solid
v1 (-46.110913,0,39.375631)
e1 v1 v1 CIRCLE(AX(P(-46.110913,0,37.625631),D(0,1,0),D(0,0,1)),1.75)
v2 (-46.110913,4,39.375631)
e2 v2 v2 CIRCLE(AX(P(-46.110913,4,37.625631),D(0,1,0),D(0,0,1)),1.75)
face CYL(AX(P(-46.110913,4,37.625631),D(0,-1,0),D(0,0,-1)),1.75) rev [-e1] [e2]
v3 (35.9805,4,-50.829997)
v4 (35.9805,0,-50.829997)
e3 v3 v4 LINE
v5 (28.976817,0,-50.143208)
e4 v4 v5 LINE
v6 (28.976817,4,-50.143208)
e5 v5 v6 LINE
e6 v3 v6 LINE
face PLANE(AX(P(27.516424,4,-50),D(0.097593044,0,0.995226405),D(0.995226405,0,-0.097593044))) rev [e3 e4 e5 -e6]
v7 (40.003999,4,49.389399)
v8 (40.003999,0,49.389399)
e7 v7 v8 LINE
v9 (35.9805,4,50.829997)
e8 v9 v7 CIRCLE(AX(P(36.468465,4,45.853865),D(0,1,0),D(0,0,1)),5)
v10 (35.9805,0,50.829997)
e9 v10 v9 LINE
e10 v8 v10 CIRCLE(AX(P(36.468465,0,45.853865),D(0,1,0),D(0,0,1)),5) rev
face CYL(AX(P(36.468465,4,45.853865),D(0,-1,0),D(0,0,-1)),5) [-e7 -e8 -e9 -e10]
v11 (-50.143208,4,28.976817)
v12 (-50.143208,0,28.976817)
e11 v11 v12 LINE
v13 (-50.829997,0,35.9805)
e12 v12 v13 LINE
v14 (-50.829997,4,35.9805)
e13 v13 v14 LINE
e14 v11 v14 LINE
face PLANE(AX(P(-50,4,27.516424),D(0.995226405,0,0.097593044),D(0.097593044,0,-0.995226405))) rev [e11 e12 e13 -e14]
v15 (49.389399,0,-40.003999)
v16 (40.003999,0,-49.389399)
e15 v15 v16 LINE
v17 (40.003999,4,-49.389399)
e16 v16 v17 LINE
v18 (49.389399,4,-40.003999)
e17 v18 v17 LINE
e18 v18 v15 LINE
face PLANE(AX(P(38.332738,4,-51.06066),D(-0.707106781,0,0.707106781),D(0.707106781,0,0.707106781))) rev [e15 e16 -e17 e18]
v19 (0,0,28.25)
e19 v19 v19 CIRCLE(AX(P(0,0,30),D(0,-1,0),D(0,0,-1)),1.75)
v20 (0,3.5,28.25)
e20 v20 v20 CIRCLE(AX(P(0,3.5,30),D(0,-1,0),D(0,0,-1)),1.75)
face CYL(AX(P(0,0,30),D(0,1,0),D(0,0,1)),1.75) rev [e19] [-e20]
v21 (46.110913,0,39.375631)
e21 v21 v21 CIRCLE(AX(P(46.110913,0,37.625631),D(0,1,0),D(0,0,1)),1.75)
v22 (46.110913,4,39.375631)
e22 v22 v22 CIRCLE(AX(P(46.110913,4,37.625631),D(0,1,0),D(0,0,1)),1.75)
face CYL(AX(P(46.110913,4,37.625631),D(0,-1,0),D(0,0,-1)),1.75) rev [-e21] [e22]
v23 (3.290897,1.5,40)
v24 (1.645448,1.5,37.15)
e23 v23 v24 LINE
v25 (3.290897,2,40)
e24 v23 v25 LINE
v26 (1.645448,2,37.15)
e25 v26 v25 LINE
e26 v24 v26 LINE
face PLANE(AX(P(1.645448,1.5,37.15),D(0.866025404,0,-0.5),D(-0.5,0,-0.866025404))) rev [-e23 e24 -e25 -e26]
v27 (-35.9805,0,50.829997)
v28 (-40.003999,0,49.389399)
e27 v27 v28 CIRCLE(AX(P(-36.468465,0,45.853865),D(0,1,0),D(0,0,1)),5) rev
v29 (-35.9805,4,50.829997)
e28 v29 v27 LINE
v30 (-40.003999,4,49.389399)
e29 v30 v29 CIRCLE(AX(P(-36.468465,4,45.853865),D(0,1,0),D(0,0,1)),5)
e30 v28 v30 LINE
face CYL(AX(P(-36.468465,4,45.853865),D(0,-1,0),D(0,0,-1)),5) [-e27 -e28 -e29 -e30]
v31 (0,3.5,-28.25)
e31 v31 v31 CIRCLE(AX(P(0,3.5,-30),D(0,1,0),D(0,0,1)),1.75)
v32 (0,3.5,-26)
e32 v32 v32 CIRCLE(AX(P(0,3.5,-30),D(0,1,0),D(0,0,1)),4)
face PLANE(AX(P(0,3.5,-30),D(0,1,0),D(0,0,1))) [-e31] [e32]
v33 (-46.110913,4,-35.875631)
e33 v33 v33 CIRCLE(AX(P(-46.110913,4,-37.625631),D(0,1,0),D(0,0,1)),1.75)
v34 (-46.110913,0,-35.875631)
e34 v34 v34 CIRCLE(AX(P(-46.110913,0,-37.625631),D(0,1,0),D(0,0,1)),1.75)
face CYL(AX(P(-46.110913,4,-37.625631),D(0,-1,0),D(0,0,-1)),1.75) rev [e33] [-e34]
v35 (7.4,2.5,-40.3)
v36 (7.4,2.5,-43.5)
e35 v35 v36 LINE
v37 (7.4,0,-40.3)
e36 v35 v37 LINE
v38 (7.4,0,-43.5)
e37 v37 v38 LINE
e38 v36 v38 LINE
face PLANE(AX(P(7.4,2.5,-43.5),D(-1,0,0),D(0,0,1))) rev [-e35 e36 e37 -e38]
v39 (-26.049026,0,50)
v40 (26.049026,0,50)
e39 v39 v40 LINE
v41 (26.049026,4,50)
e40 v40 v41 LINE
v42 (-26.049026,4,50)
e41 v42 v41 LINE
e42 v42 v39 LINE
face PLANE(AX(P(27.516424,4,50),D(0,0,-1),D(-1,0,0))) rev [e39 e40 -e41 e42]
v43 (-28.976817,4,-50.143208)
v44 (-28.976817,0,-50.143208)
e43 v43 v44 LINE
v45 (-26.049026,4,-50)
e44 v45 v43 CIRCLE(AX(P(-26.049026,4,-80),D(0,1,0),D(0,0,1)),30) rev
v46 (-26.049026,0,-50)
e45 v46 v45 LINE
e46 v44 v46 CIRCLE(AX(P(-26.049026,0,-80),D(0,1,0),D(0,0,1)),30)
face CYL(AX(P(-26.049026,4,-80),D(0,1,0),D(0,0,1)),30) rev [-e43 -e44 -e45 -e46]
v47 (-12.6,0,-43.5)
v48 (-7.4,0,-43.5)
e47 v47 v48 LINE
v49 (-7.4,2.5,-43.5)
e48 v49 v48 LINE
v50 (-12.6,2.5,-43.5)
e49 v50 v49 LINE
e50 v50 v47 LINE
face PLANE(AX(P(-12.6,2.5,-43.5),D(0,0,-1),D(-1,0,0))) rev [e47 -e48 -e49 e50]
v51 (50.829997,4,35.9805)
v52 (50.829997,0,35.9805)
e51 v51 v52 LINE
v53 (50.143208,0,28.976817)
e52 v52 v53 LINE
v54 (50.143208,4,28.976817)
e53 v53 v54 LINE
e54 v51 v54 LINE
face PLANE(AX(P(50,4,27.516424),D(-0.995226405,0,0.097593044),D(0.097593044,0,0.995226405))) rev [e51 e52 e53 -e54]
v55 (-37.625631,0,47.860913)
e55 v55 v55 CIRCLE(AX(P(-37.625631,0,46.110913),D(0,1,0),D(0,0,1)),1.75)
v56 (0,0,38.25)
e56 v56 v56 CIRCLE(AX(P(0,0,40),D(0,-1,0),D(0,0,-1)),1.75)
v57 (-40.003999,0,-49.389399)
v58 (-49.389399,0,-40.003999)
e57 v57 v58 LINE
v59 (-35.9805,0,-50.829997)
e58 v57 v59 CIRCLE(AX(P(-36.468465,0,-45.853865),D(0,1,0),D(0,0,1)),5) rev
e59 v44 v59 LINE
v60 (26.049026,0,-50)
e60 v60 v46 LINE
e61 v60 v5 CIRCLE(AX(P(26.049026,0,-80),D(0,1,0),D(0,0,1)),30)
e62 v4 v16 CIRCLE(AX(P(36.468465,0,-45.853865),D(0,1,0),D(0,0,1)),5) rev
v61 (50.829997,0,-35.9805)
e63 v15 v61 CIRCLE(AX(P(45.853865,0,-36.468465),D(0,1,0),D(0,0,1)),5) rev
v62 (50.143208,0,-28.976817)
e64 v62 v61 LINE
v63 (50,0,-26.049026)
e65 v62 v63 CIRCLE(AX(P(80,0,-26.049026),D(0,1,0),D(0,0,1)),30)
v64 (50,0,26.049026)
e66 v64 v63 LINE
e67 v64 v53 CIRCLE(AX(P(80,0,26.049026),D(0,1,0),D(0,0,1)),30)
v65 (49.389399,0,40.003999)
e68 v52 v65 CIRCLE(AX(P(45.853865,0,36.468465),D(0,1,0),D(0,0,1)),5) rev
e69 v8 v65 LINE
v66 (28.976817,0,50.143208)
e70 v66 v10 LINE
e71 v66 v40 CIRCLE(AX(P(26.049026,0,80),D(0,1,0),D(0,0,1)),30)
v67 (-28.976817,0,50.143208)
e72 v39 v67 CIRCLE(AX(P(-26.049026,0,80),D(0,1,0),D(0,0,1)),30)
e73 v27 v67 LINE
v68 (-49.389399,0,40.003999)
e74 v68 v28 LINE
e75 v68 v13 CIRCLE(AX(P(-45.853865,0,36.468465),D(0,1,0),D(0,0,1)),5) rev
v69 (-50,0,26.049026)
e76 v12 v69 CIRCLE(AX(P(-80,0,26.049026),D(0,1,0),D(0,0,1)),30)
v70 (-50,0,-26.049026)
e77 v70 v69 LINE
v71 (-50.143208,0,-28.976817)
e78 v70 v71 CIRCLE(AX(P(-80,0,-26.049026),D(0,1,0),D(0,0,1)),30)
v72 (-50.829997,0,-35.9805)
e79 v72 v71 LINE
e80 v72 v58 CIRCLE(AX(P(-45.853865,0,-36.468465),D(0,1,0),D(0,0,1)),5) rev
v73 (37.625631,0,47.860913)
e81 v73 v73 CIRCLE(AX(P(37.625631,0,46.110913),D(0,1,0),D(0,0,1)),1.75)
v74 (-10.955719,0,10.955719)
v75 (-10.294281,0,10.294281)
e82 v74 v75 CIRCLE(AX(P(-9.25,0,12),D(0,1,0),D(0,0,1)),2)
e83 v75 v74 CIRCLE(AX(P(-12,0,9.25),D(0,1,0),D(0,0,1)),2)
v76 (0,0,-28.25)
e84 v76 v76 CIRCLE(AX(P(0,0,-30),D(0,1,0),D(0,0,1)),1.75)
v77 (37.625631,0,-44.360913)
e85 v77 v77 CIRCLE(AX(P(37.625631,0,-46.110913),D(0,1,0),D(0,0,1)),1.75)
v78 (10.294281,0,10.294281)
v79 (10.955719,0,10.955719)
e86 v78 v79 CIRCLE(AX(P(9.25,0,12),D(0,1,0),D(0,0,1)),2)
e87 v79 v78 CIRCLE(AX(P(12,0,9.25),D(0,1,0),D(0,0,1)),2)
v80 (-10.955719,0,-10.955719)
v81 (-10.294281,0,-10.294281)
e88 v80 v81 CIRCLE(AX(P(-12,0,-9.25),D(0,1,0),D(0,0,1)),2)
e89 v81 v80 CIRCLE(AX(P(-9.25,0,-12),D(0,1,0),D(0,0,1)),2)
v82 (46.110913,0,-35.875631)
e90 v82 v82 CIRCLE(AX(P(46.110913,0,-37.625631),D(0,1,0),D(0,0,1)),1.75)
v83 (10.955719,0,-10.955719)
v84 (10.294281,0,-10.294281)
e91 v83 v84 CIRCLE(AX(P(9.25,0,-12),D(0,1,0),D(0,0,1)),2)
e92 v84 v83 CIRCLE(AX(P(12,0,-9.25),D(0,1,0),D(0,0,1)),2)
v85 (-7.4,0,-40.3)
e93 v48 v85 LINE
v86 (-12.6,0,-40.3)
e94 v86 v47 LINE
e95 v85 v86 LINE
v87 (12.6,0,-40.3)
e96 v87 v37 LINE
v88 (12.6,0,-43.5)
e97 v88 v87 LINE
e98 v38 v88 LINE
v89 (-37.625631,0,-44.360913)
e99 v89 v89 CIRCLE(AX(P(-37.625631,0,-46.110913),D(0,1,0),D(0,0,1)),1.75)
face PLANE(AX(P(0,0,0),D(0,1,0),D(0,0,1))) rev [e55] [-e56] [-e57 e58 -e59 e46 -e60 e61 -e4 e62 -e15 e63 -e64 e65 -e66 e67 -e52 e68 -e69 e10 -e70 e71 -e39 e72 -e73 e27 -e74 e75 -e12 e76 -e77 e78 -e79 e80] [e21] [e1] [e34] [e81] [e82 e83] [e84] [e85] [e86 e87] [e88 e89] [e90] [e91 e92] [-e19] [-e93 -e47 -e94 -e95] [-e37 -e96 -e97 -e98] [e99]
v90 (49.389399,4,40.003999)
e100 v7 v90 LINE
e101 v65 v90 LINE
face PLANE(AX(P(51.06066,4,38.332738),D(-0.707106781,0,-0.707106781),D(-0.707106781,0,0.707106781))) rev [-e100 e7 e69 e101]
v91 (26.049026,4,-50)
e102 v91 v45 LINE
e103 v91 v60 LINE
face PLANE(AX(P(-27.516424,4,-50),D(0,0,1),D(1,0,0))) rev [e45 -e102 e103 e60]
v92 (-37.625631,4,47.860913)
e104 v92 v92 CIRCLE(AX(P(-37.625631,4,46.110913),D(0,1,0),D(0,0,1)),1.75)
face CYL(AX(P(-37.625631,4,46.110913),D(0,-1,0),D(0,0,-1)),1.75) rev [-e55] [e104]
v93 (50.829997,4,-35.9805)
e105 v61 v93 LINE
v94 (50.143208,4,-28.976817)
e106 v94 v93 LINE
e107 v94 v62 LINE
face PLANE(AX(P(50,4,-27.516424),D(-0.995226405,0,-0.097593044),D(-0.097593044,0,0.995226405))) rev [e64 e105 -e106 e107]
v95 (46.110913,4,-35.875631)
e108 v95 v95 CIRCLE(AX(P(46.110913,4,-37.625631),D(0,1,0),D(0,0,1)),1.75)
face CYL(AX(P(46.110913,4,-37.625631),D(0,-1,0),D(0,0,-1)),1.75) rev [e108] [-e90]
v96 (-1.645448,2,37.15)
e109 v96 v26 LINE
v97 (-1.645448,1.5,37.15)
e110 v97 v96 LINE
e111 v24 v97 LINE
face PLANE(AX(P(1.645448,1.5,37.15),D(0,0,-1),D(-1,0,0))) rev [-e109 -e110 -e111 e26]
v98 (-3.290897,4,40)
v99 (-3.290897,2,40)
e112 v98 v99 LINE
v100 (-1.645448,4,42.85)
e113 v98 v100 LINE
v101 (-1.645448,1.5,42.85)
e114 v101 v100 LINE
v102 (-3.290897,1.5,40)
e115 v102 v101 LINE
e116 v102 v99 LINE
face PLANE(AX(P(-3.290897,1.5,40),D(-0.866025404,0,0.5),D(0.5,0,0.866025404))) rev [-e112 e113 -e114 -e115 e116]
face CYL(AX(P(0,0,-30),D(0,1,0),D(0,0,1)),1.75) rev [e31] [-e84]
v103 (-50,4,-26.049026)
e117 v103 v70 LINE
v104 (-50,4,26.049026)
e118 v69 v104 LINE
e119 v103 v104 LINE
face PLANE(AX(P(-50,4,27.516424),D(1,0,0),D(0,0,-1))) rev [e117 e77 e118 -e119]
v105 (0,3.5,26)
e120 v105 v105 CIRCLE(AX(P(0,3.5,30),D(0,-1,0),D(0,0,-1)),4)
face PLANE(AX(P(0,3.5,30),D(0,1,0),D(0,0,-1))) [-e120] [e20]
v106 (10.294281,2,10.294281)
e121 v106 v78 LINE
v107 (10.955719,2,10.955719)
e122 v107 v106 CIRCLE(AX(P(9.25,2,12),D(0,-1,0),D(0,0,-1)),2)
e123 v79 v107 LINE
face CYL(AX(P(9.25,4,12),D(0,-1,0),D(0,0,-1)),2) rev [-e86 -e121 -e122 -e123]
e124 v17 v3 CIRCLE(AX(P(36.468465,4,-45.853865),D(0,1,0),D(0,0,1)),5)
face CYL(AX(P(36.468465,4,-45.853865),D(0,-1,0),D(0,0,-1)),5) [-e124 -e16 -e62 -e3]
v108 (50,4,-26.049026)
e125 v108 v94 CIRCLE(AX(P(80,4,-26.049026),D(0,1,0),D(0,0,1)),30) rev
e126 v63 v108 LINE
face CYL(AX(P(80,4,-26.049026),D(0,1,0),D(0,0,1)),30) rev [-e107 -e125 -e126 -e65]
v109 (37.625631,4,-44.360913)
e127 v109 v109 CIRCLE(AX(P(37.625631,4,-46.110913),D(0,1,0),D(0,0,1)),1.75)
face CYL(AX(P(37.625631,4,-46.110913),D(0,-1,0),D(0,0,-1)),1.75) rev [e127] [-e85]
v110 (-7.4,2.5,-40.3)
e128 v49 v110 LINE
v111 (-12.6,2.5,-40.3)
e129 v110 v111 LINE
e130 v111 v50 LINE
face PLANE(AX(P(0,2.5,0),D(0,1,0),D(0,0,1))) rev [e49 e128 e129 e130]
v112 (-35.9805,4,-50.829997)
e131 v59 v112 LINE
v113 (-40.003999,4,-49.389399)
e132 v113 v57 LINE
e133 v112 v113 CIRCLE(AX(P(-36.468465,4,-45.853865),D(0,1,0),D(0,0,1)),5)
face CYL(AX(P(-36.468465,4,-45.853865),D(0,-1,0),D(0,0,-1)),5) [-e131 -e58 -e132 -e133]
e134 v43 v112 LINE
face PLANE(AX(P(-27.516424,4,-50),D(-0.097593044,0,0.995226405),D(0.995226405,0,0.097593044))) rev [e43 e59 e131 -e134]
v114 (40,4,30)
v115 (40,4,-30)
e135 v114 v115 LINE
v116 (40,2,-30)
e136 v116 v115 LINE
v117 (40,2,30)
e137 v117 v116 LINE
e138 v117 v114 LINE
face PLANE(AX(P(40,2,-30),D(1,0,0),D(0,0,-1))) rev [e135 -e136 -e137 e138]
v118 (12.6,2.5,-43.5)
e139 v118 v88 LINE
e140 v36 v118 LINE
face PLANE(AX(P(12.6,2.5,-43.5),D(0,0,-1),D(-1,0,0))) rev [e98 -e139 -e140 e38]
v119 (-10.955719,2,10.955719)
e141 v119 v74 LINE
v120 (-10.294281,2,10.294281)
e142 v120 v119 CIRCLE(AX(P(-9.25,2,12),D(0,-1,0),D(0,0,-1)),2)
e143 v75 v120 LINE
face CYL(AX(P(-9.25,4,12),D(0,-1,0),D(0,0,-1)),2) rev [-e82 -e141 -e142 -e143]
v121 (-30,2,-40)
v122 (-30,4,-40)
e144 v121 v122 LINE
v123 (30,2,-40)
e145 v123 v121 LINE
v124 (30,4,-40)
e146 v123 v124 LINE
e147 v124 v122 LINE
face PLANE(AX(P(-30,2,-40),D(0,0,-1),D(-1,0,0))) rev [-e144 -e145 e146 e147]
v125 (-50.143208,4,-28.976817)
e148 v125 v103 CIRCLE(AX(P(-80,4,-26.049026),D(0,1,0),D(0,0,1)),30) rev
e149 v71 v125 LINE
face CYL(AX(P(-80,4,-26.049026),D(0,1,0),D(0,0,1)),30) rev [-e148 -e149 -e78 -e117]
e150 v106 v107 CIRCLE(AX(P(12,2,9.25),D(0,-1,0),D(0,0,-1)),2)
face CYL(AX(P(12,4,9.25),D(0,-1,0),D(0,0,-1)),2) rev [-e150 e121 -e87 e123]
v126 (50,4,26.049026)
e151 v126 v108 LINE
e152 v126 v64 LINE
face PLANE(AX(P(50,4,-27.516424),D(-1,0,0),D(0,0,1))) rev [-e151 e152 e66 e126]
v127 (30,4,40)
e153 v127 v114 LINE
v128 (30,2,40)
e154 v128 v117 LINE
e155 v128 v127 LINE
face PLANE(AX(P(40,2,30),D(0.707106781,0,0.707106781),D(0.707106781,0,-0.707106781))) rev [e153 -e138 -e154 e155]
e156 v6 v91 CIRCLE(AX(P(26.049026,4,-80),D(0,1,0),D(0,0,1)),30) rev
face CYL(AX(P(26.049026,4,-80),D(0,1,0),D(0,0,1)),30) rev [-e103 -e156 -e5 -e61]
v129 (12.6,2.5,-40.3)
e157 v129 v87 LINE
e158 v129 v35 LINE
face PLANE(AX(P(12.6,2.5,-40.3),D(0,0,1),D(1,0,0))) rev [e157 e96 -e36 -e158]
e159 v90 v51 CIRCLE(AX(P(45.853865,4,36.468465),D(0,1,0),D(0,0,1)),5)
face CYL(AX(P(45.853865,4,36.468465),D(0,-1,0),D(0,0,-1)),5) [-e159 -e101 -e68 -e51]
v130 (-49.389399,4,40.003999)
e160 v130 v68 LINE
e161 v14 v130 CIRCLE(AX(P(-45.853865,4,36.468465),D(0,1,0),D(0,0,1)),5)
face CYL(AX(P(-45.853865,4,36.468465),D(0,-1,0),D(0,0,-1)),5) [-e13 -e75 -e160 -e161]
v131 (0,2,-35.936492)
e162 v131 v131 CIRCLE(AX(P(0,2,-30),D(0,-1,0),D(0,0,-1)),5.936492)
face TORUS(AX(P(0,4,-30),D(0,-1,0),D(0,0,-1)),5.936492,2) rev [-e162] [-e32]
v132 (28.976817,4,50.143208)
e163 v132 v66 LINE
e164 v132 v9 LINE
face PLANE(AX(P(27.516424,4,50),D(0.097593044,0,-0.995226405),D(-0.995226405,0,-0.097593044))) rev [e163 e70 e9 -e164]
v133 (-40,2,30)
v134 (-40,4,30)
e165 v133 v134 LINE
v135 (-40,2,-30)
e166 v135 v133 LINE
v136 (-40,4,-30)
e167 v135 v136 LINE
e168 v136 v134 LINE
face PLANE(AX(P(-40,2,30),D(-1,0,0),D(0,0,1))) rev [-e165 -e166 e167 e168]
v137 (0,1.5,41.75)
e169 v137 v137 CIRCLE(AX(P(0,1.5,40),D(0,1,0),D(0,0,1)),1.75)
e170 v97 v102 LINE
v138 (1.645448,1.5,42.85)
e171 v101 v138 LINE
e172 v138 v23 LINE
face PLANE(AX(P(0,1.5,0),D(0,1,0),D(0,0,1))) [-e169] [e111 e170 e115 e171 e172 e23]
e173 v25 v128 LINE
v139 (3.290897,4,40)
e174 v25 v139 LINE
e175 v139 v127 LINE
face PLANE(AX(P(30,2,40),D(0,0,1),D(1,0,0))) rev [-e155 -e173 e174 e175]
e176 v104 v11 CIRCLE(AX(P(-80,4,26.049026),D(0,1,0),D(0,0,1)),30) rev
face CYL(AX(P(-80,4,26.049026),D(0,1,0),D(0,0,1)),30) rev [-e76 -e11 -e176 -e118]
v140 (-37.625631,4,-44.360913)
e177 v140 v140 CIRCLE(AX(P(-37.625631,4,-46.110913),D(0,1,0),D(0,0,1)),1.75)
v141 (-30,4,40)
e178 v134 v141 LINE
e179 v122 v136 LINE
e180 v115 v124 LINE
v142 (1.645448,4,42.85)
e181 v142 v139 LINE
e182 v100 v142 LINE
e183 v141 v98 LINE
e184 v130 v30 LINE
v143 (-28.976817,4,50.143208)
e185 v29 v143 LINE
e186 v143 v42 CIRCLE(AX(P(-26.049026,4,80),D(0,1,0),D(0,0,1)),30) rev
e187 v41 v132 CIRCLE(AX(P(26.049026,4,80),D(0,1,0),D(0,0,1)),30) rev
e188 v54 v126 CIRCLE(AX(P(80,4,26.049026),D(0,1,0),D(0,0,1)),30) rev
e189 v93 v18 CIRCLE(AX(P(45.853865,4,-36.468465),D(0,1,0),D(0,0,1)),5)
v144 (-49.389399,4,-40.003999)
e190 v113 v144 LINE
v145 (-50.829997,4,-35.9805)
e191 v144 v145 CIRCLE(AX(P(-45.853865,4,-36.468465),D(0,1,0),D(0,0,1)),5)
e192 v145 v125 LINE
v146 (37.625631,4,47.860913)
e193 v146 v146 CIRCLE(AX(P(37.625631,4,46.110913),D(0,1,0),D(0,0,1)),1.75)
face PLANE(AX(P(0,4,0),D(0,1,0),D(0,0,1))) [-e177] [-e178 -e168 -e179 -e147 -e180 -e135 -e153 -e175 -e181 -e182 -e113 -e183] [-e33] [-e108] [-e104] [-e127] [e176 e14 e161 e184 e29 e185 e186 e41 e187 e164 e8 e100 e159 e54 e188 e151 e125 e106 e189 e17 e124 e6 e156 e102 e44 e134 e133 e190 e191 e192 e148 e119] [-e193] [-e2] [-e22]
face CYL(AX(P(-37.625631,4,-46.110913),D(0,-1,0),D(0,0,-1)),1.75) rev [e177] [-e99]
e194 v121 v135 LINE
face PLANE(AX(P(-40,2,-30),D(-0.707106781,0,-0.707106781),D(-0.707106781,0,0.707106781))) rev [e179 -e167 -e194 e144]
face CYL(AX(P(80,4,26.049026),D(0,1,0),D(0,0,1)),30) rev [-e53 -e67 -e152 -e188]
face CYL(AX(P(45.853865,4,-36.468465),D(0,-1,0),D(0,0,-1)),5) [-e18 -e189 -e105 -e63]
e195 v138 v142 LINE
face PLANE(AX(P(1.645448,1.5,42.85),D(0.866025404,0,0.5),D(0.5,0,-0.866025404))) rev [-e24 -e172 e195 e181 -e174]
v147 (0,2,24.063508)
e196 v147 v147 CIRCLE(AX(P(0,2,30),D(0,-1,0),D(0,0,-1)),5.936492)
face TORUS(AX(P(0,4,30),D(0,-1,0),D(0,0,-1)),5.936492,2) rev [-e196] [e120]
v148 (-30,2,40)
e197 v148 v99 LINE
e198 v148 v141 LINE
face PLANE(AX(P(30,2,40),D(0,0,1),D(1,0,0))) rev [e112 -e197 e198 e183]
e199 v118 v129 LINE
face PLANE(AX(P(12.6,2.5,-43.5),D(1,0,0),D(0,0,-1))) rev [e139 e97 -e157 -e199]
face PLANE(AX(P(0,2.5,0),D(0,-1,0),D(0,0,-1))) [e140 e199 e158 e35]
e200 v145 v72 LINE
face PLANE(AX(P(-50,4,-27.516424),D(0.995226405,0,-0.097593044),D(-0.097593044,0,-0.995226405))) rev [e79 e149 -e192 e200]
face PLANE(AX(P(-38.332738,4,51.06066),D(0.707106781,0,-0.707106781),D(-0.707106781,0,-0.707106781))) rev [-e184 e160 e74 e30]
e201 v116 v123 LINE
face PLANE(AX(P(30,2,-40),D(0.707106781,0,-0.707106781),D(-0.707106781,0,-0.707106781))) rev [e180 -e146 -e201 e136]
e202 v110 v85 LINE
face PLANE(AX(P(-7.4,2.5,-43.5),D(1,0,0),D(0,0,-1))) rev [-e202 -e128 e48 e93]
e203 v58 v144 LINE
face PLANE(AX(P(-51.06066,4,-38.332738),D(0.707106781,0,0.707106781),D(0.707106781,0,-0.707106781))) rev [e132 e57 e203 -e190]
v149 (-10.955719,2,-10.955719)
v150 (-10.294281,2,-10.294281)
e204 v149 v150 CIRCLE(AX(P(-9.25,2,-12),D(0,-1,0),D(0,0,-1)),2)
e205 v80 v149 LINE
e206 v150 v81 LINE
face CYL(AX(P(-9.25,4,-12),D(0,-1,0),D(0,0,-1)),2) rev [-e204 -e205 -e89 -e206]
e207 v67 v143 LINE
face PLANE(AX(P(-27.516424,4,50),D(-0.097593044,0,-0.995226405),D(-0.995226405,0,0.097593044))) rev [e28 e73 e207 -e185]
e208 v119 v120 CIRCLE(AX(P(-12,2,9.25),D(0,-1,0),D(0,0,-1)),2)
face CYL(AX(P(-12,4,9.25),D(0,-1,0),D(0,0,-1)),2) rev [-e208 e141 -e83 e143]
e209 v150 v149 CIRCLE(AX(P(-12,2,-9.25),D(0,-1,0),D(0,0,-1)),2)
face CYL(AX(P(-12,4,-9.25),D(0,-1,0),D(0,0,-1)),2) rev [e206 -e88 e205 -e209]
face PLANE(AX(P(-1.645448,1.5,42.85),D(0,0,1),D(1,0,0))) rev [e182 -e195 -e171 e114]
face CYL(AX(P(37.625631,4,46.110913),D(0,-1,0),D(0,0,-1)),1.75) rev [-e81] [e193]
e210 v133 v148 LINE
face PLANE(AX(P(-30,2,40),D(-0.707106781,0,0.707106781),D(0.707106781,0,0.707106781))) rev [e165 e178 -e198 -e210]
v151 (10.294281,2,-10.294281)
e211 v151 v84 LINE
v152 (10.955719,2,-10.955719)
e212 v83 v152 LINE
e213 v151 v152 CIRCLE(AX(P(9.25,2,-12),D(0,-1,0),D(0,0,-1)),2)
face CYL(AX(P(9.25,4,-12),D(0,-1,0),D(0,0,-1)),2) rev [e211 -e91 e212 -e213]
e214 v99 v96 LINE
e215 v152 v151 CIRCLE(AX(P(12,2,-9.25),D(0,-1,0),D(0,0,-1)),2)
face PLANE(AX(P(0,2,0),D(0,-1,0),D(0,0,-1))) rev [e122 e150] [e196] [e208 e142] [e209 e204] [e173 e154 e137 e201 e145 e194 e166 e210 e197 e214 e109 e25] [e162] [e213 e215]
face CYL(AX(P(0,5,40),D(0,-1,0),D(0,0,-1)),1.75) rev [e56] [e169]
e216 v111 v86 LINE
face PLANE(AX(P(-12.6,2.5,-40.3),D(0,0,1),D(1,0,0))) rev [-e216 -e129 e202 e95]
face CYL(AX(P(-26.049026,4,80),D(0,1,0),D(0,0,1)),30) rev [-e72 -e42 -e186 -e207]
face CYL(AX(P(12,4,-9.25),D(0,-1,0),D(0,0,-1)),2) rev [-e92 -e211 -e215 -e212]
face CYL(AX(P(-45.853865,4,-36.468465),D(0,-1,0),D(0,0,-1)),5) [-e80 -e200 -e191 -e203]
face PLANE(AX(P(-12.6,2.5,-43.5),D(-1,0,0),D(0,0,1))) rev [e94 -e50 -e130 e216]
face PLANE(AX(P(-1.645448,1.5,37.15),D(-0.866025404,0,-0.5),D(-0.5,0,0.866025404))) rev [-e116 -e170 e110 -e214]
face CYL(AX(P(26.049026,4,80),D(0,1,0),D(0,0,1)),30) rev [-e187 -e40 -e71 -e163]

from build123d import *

# Parameters (mm, degrees)
SKETCH1_R                  = 1.75
BOSS_EXTRUDE1_DEPTH        = 4
CUT_EXTRUDE1_DEPTH         = 2
SKETCH4_R                  = 1.75
CUT_EXTRUDE3_DEPTH         = 73.238369544
BOSS_EXTRUDE2_START        = 1.5
SKETCH5_R                  = 4
SKETCH5_R_2                = 1.75
BOSS_EXTRUDE2_DEPTH        = 1.5
REDONDEO1_R                = 2
REDONDEO2_R                = 30
REDONDEO3_R                = 5
CORTAR_EXTRUIR2_DEPTH      = 2.5
CROQUIS1_R                 = 1.75
CORTAR_EXTRUIR1_DEPTH      = 5
CORTAR_EXTRUIR3_DEPTH      = 73.029377138
CORTAR_EXTRUIR3_DEPTH_BACK = 73.029377138
CROQUIS5_R                 = 2
CROQUIS6_W                 = 5.2
CROQUIS6_H                 = 3.2
CORTAR_EXTRUIR4_DEPTH      = 2.5


with BuildPart() as part:
    # Sketch1 → Boss-Extrude1 (new body)
    with BuildSketch(Plane(origin=(0, 0, 0), x_dir=(1, 0, 0), z_dir=(0, 1, 0))):
        Polygon((-27.516424079, 50), (27.516424079, 50), (38.33273811, 51.060660172), (51.060660172, 38.33273811), (50, 27.516424079), (50, -27.516424079), (51.060660172, -38.33273811), (38.33273811, -51.060660172), (27.516424079, -50), (-27.516424079, -50), (-38.33273811, -51.060660172), (-51.060660172, -38.33273811), (-50, -27.516424079), (-50, 27.516424079), (-51.060660172, 38.33273811), (-38.33273811, 51.060660172), align=None)
        with Locations(Location((37.625631329, 46.110912703, 0), (0, 0, 270))):
            Circle(SKETCH1_R, mode=Mode.SUBTRACT)
        with Locations(Location((46.110912703, 37.625631329, 0), (0, 0, 270))):
            Circle(SKETCH1_R, mode=Mode.SUBTRACT)
        with Locations(Location((37.625631329, -46.110912703, 0), (0, 0, 270))):
            Circle(SKETCH1_R, mode=Mode.SUBTRACT)
        with Locations(Location((46.110912703, -37.625631329, 0), (0, 0, 270))):
            Circle(SKETCH1_R, mode=Mode.SUBTRACT)
        with Locations(Location((-46.110912703, -37.625631329, 0), (0, 0, 270))):
            Circle(SKETCH1_R, mode=Mode.SUBTRACT)
        with Locations(Location((-37.625631329, -46.110912703, 0), (0, 0, 270))):
            Circle(SKETCH1_R, mode=Mode.SUBTRACT)
        with Locations(Location((-37.625631329, 46.110912703, 0), (0, 0, 270))):
            Circle(SKETCH1_R, mode=Mode.SUBTRACT)
        with Locations(Location((-46.110912703, 37.625631329, 0), (0, 0, 270))):
            Circle(SKETCH1_R, mode=Mode.SUBTRACT)
    extrude(amount=BOSS_EXTRUDE1_DEPTH)

    # Sketch2 → Cut-Extrude1 (cut)
    with BuildSketch(Plane(origin=(0, 4, 0), x_dir=(1, 0, 0), z_dir=(0, 1, 0))):
        Polygon((-40, -30), (-40, 30), (-30, 40), (30, 40), (40, 30), (40, -30), (30, -40), (-30, -40), align=None)
    extrude(amount=-CUT_EXTRUDE1_DEPTH, mode=Mode.SUBTRACT)

    # Sketch4 → Cut-Extrude3 (cut, through all)
    with BuildSketch(Plane(origin=(0, 2, 0), x_dir=(1, 0, 0), z_dir=(0, 1, 0))):
        with Locations(Location((0, 30, 0), (0, 0, 270))):
            Circle(SKETCH4_R)
    cut_extrude3 = extrude(amount=-CUT_EXTRUDE3_DEPTH, mode=Mode.SUBTRACT)

    # Sketch5 → Boss-Extrude2 (add)
    with BuildSketch(Plane(origin=(0, 2, 0), x_dir=(1, 0, 0), z_dir=(0, 1, 0)).offset(BOSS_EXTRUDE2_START)):
        with Locations(Location((0, 30, 0), (0, 0, 90))):
            Circle(SKETCH5_R)
        with Locations(Location((0, 30, 0), (0, 0, 270))):
            Circle(SKETCH5_R_2, mode=Mode.SUBTRACT)
    boss_extrude2 = extrude(amount=-BOSS_EXTRUDE2_DEPTH)

    # Simetría1: Cut-Extrude3, Boss-Extrude2 across plane
    add(cut_extrude3.mirror(Plane.XY), mode=Mode.SUBTRACT)
    add(boss_extrude2.mirror(Plane.XY))

    # Redondeo1
    # the kernel refuses this fillet: 2 mm, written as the material it adds along each edge
    with BuildSketch(Plane(origin=(0, 2, -30), x_dir=(0, 0, -1), z_dir=(1, 0, 0))) as redondeo1_piece_1:
        with BuildLine():
            CenterArc((5.936491673, 2), REDONDEO1_R, 194.477512186, 75.522487814)
            Line((4, 1.5), (3.961270167, 1.49))
            ThreePointArc((3.961270167, 1.49), (3.96, 0.75), (3.96, 0))
            Line((3.96, 0), (4, -0.04))
            Line((4, -0.04), (5.936491673, -0.04))
            Line((5.936491673, -0.04), (5.936491673, 0))
        make_face()
    revolve(axis=Axis((0, 2, -30), (0, 1, 0)))
    with BuildSketch(Plane(origin=(0, 2, 30), x_dir=(0, 0, 1), z_dir=(1, 0, 0))) as redondeo1_piece_2:
        with BuildLine():
            CenterArc((5.936491673, -2), REDONDEO1_R, 90, 75.522487814)
            Line((4, -1.5), (3.961270167, -1.49))
            ThreePointArc((3.961270167, -1.49), (3.96, -0.75), (3.96, 0))
            Line((3.96, 0), (4, 0.04))
            Line((4, 0.04), (5.936491673, 0.04))
            Line((5.936491673, 0.04), (5.936491673, 0))
        make_face()
    revolve(axis=Axis((0, 2, 30), (0, -1, 0)))

    # Redondeo2
    # the kernel refuses this fillet: 30 mm, written as the material it adds along each edge
    with BuildSketch(Plane(origin=(-27.516424079, 0, -50), x_dir=(1, 0, 0), z_dir=(0, 1, 0)), Plane(origin=(-27.516424079, 0, 50), x_dir=(-0.9952264052892461, 0, 0.09759304388656657), z_dir=(0, 1, 0)), Plane(origin=(-50, 0, 27.516424079), x_dir=(0, 0, -1), z_dir=(0, 1, 0)), Plane(origin=(-50, 0, -27.516424079), x_dir=(-0.09759304388655696, 0, -0.9952264052892469), z_dir=(0, 1, 0))) as redondeo2_piece_1:
        with BuildLine():
            CenterArc((REDONDEO2_R * 0.048913268002, REDONDEO2_R), REDONDEO2_R, 264.399415997, 5.600584003)
            Line((-REDONDEO2_R * 0.0486797758846, REDONDEO2_R * 0.00477359471075), (0, 0))
            Line((0, 0), (REDONDEO2_R * 0.048913268002, 0))
        make_face()
    extrude(amount=4)
    with BuildSketch(Plane(origin=(27.516424079, 0, -50), x_dir=(-1, 0, 0), z_dir=(0, 1, 0)), Plane(origin=(50, 0, -27.516424079), x_dir=(0.09759304388656798, 0, -0.9952264052892459), z_dir=(0, 1, 0)), Plane(origin=(50, 0, 27.516424079), x_dir=(0, 0, -1), z_dir=(0, 1, 0)), Plane(origin=(27.516424079, 0, 50), x_dir=(0.9952264052892461, 0, 0.09759304388656634), z_dir=(0, 1, 0))) as redondeo2_piece_2:
        with BuildLine():
            CenterArc((REDONDEO2_R * 0.048913268002, -REDONDEO2_R), REDONDEO2_R, 90, 5.600584003)
            Line((-REDONDEO2_R * 0.0486797758846, -REDONDEO2_R * 0.00477359471075), (0, 0))
            Line((0, 0), (REDONDEO2_R * 0.048913268002, 0))
        make_face()
    extrude(amount=4)

    # Redondeo3
    redondeo3_edges = [part.edges().sort_by_distance(p)[0] for p in [
        (38.33273811, 2, -51.060660172),
        (51.060660172, 2, -38.33273811),
        (51.060660172, 2, 38.33273811),
        (38.33273811, 2, 51.060660172),
        (-38.33273811, 2, 51.060660172),
        (-51.060660172, 2, 38.33273811),
        (-51.060660172, 2, -38.33273811),
        (-38.33273811, 2, -51.060660172),
    ]]
    fillet(redondeo3_edges, radius=REDONDEO3_R)

    # Croquis3 → Cortar-Extruir2 (cut)
    with BuildSketch(Plane(origin=(0, 4, 0), x_dir=(1, 0, 0), z_dir=(0, 1, 0))):
        Polygon((1.645448267, -37.15), (3.290896534, -40), (1.645448267, -42.85), (-1.645448267, -42.85), (-3.290896534, -40), (-1.645448267, -37.15), align=None)
    extrude(amount=-CORTAR_EXTRUIR2_DEPTH, mode=Mode.SUBTRACT)

    # Croquis1 → Cortar-Extruir1 (cut)
    with BuildSketch(Plane.XZ):
        with Locations(Location((0, 40, 0), (0, 0, 270))):
            Circle(CROQUIS1_R)
    extrude(amount=-CORTAR_EXTRUIR1_DEPTH, mode=Mode.SUBTRACT)

    # Croquis5 → Cortar-Extruir3 (cut, two sides: drawn at the far end of the back side and taken through both)
    with BuildSketch(Plane.XZ.offset(-CORTAR_EXTRUIR3_DEPTH_BACK)):
        with Locations((-12, -9.25)):
            Circle(CROQUIS5_R)
        with Locations((-12, 9.25)):
            Circle(CROQUIS5_R)
        with Locations((12, 9.25)):
            Circle(CROQUIS5_R)
        with Locations((12, -9.25)):
            Circle(CROQUIS5_R)
        with Locations((9.25, -12)):
            Circle(CROQUIS5_R)
        with Locations((-9.25, -12)):
            Circle(CROQUIS5_R)
        with Locations((9.25, 12)):
            Circle(CROQUIS5_R)
        with Locations((-9.25, 12)):
            Circle(CROQUIS5_R)
    extrude(amount=CORTAR_EXTRUIR3_DEPTH + CORTAR_EXTRUIR3_DEPTH_BACK, mode=Mode.SUBTRACT)

    # Croquis6 → Cortar-Extruir4 (cut)
    with BuildSketch(Plane.XZ):
        with Locations((-10, -41.9)):
            Rectangle(CROQUIS6_W, CROQUIS6_H)
        with Locations((10, -41.9)):
            Rectangle(CROQUIS6_W, CROQUIS6_H)
    extrude(amount=-CORTAR_EXTRUIR4_DEPTH, mode=Mode.SUBTRACT)


solid = part.part
